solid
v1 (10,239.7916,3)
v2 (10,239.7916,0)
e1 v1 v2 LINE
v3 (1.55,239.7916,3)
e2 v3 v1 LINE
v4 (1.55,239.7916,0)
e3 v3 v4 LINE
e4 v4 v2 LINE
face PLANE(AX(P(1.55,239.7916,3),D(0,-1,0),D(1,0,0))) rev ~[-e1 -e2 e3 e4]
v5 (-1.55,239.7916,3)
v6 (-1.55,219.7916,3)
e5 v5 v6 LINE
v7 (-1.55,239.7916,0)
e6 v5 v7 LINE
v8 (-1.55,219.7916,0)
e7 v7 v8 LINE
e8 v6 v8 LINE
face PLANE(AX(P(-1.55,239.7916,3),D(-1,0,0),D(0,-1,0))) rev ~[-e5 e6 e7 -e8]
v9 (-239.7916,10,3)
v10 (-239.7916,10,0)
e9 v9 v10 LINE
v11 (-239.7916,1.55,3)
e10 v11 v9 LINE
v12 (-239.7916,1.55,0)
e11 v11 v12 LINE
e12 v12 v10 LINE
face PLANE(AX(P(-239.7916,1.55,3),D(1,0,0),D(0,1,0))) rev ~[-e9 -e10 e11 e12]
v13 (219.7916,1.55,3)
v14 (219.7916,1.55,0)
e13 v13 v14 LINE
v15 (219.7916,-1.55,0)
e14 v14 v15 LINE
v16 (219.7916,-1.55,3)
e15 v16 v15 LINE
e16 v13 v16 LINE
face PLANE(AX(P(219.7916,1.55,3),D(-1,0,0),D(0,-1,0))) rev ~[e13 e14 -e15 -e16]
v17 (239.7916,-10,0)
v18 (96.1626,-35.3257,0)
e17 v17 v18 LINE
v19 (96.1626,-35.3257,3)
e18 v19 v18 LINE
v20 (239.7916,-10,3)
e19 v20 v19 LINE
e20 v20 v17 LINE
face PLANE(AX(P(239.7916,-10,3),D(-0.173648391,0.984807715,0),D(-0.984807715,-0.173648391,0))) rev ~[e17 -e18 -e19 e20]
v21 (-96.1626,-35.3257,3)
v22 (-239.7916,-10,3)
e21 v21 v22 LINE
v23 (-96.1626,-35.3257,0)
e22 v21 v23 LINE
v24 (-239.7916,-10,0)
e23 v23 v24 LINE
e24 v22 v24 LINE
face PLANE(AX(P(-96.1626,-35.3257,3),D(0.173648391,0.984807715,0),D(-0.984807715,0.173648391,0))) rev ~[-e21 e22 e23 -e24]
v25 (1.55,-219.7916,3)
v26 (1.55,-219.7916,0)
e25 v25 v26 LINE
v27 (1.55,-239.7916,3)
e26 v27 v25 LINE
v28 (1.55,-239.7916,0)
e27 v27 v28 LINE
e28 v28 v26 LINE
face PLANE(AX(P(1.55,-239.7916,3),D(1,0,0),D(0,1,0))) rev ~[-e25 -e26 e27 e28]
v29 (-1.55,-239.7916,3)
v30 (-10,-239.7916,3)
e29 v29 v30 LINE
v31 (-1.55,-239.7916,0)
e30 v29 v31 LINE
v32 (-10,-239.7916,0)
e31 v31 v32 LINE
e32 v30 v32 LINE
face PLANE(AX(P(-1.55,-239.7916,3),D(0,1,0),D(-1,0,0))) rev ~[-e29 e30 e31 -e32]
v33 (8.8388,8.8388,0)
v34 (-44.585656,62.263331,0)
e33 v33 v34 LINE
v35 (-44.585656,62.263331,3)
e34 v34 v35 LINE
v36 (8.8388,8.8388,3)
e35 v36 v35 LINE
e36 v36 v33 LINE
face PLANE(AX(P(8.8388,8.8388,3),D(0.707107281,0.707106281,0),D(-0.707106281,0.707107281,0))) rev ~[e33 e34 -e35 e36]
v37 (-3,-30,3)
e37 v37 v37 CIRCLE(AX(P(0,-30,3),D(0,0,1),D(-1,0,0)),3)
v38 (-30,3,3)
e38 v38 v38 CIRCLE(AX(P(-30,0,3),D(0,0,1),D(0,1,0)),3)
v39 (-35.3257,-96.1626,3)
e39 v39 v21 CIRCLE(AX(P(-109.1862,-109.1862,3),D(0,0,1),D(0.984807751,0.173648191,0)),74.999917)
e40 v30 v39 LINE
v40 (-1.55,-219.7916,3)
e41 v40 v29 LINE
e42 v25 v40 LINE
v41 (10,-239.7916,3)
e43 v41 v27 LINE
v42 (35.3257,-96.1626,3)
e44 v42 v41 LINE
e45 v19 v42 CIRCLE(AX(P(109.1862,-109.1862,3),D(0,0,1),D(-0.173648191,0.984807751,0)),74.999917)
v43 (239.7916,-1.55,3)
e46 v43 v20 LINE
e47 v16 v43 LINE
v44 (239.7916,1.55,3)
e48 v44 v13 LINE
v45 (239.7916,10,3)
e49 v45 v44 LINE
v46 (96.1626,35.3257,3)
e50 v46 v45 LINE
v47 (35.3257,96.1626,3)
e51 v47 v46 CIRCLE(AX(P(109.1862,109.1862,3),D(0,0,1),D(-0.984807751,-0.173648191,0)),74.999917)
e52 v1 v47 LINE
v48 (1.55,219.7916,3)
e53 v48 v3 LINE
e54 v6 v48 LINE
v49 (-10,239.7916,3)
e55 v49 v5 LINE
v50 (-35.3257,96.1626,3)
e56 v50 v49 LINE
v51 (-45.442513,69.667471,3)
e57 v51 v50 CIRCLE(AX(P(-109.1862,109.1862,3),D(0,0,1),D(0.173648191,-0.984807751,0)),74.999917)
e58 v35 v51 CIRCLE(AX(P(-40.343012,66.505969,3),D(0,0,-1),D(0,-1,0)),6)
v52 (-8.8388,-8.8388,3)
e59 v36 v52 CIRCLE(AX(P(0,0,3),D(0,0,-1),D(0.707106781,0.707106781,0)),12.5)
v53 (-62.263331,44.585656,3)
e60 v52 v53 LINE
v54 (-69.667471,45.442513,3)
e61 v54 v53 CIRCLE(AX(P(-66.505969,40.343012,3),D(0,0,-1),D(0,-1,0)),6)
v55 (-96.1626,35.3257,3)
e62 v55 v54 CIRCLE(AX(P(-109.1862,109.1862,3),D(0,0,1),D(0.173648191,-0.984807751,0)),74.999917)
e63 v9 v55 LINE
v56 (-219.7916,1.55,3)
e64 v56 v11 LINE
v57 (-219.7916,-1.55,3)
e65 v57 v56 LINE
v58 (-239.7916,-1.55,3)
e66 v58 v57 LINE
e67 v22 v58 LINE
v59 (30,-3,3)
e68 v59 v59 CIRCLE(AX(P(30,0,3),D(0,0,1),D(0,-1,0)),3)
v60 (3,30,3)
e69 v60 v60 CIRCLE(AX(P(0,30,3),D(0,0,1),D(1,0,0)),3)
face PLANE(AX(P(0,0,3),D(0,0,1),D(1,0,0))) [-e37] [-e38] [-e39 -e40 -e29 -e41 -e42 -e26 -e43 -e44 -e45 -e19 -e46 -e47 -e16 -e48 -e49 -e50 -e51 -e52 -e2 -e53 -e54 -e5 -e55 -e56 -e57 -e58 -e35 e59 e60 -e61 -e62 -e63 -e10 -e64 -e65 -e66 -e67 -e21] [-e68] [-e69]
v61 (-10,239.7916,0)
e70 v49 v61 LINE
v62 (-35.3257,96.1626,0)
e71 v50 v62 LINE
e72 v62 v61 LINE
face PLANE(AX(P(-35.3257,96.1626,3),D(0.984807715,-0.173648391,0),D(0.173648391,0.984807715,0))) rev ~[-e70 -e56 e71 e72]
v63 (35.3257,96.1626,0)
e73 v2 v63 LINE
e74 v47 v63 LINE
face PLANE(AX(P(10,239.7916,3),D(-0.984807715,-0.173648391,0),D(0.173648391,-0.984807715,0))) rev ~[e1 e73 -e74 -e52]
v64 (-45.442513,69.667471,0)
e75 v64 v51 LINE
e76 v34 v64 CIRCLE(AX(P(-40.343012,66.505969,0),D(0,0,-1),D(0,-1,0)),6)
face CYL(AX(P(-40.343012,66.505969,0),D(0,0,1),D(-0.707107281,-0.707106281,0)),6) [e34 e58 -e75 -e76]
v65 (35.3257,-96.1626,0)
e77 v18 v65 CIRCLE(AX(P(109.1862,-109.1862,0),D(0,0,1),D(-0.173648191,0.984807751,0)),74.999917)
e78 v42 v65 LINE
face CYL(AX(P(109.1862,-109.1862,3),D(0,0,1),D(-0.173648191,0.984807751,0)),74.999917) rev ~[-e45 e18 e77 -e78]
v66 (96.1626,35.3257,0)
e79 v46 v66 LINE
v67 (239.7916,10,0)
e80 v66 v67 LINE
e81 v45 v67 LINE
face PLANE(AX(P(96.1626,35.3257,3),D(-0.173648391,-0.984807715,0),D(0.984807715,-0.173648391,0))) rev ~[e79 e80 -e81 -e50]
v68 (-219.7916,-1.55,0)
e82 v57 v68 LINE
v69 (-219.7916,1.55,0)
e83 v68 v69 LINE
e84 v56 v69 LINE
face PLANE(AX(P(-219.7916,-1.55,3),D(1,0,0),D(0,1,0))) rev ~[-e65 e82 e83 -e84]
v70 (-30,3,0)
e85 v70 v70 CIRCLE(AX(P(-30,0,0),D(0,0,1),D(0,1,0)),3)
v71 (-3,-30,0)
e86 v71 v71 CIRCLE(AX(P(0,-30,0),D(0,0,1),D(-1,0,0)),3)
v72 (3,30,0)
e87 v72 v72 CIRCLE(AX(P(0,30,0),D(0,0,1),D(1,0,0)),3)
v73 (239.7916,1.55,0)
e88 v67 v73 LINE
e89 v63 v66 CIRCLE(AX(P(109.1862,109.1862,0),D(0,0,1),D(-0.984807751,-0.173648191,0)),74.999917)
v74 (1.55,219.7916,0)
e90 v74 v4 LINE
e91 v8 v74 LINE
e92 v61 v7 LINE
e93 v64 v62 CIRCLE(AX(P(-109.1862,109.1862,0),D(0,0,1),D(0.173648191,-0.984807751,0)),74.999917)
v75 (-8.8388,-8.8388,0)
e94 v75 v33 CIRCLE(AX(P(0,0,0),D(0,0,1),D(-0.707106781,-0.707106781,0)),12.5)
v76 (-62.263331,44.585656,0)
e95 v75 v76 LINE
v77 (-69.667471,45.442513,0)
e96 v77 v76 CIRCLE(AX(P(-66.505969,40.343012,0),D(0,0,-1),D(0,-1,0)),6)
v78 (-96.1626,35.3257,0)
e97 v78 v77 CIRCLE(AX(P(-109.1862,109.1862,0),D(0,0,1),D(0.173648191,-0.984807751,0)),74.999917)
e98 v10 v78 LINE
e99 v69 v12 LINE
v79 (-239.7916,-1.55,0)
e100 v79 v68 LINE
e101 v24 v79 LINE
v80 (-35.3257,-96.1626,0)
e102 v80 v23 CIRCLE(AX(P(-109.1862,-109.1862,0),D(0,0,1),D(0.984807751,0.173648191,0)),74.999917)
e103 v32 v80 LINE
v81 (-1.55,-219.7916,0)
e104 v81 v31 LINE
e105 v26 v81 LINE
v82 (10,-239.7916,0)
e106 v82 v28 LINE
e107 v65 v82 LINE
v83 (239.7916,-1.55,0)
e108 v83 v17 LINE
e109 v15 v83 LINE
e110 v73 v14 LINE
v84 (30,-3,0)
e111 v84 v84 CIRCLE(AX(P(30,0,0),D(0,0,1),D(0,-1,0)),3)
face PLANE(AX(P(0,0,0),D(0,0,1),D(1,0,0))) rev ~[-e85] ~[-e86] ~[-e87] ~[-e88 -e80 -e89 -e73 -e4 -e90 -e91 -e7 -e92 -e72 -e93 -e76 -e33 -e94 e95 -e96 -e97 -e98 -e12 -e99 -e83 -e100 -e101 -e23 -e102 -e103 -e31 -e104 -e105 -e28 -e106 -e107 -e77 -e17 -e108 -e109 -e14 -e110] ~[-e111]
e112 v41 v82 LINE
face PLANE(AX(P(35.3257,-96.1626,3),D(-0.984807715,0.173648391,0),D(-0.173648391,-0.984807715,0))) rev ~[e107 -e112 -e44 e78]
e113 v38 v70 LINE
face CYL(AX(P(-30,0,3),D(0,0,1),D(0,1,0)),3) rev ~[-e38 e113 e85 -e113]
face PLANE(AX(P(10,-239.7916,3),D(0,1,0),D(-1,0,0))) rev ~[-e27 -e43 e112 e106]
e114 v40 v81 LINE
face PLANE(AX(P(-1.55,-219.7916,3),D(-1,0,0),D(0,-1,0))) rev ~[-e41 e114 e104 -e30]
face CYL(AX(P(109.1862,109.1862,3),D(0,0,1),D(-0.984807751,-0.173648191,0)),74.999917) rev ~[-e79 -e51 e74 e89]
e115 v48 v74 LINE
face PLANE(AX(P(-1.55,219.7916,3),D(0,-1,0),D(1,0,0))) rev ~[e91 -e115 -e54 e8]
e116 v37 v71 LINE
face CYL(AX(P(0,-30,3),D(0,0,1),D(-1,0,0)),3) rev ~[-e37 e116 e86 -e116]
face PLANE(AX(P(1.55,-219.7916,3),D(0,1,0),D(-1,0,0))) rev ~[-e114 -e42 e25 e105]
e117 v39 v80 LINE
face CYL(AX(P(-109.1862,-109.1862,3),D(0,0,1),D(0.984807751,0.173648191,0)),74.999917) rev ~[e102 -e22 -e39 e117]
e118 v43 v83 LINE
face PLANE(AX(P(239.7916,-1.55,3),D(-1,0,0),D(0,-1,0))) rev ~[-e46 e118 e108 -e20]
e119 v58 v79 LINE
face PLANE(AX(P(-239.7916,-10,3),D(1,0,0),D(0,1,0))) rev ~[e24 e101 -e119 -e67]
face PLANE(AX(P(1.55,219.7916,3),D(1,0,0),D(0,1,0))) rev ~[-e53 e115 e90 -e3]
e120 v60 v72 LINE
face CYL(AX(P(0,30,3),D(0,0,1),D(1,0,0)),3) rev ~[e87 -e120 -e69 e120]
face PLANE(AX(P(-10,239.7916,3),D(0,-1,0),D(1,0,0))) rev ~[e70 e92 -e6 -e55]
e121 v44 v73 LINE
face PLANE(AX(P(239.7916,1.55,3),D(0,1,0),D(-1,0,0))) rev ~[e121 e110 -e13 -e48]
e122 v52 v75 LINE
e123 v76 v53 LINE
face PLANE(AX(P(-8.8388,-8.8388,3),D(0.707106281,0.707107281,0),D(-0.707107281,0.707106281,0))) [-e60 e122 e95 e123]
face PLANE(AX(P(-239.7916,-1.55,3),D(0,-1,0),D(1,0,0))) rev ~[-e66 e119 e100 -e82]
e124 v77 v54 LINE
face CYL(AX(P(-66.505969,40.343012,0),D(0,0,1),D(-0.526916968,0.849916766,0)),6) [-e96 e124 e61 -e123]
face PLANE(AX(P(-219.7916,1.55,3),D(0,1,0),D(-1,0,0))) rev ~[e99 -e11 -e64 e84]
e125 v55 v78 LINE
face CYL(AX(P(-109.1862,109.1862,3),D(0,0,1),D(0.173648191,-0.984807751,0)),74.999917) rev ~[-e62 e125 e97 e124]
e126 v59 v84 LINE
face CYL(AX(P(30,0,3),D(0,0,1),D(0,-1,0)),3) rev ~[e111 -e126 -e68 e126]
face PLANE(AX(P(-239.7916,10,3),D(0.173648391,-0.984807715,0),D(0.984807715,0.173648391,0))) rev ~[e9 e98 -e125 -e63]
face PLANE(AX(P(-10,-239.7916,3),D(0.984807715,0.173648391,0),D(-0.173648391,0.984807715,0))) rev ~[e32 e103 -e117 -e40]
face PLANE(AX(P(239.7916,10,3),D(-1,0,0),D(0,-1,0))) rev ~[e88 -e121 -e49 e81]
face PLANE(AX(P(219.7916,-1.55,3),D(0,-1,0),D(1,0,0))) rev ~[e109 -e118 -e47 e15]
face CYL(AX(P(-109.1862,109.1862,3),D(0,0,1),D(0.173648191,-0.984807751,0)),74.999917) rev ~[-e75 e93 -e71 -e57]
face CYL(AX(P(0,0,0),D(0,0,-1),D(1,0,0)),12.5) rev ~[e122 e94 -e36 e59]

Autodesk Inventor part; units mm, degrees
ref_plane "YZ Plane" through (0, 0, 0) normal (1, 0, 0) x (0, 1, 0)
ref_plane "XZ Plane" through (0, 0, 0) normal (0, 1, 0) x (-1, 0, 0)
ref_plane "XY Plane" through (0, 0, 0) normal (0, 0, 1) x (1, 0, 0)
sketch "Sketch1" plane through (0, 0, 0) normal (0, 0, 1) x (1, 0, 0)
  circle A0 centre (0, 0) radius 37.5 construction
  circle A1 centre (0, 0) radius 12.5
  line L0 (0, 12.5) -> (35.3553, 12.5) construction
  line L1 (0, -12.5) -> (35.3553, -12.5) construction
  circle A2 centre (0, 0) radius 240
  dimension "d15" = 25
  dimension "d16" = 75
  dimension "d25" = 480
extrude "Plate1" add sketch "Sketch1" along normal blind 3
sketch "Sketch2" plane through (0, 0, 0) normal (0, 0, -1) x (-1, 0, 0)
  line L0 (18.691, -4.6928) -> (218.691, -4.6928) construction
  line L1 (218.691, -4.6928) -> (218.691, -24.6928) construction
  line L2 (218.691, -24.6928) -> (18.691, -24.6928) construction
  line L3 (18.691, -24.6928) -> (18.691, -4.6928) construction
  point P0 (0, 0)
  point P1 (-251, -525)
  dimension "d6" = 200
  dimension "d9" = 20
mark "Mark1"
sketch "Sketch4" plane through (0, 0, 3) normal (0, 0, 1) x (1, 0, 0)
  circle A0 centre (0, 0) radius 12.5 construction
  circle A1 centre (0, 0) radius 240 projected
  line L0 (0, 0) -> (240, 0) construction
  line L1 (0, 0) -> (169.7056, 169.7056) construction
  line L2 (-10, 239.7916) -> (10, 239.7916)
  circle A2 centre (0, 0) radius 240 projected
  line L3 (239.7916, -10) -> (239.7916, 10)
  line L4 (10, 239.7916) -> (35.3257, 96.1626)
  arc A3 (35.3257, 96.1626) -> (96.1626, 35.3257) centre (109.1862, 109.1862) ccw
  line L5 (96.1626, 35.3257) -> (239.7916, 10)
  line L6 (-1.55, 239.7916) -> (-1.55, 219.7916)
  line L7 (-1.55, 219.7916) -> (1.55, 219.7916)
  line L8 (1.55, 219.7916) -> (1.55, 239.7916)
  circle A4 centre (0, 30) radius 3
  line L9 (0, 30) -> (0, 0) construction
  circle A5 centre (0, 0) radius 30 construction
  point P0 (0, 219.7916)
  point P1 (0, 239.7916)
  point P2 (239.7916, 10)
  point P3 (10, 239.7916)
  point P4 (10, 239.7916)
  dimension "d39" = 60
  dimension "d28" = 20
  dimension "d29" = 45
  dimension "d30" = 10
  dimension "d31" = 75
  dimension "d32" = 3.1
  dimension "d33" = 20
  dimension "d40" = 90
  dimension "d41" = 6
extrude "Cut2" cut sketch "Sketch4" against normal blind 3 contours L5 A3 L4 A1 | L2 A1 | L8 L7 L6 L2 | A4
pattern_circular "Circular Pattern2" count 4 over 360 about axis through (0, 0, 0) along (0, 0, 1) of "Cut2"
sketch "Sketch5" plane through (0, 0, 3) normal (0, 0, 1) x (1, 0, 0)
  circle A0 centre (0, 0) radius 12.5 projected
  line L0 (8.8388, 8.8388) -> (-61.8718, 79.5495)
  line L1 (-8.8388, -8.8388) -> (-79.5495, 61.8718)
  line L2 (-79.5495, 61.8718) -> (-61.8718, 79.5495)
  line L3 (0, 0) -> (0, 35.5933) construction
  dimension "d42" = 45
  dimension "d43" = 100
extrude "Cut3" cut sketch "Sketch5" against normal blind 3 contours A0 L1 L2 L0
fillet "Corner Round1" radius 6 2 edges at (-48.0562, 65.7338, 1.5) (-65.7338, 48.0562, 1.5)
equation "\"d2\" = Thickness"
equation "\"BendReliefWidth\" = Thickness"
equation "\"BendReliefDepth\" = 0.5 * Thickness"
equation "\"CornerReliefSize\" = 4 * Thickness"
equation "\"MinimumRemnant\" = 2 * Thickness"
equation "\"TransitionRadius\" = BendRadius"
equation "\"JacobiRadiusSize\" = BendRadius"
equation "\"GapSize\" = Thickness"
equation "\"Thickness\" = 3"
equation "\"BendRadius\" = 2.75"
properties part number "TRM 030 star main" material "AISI 304"
